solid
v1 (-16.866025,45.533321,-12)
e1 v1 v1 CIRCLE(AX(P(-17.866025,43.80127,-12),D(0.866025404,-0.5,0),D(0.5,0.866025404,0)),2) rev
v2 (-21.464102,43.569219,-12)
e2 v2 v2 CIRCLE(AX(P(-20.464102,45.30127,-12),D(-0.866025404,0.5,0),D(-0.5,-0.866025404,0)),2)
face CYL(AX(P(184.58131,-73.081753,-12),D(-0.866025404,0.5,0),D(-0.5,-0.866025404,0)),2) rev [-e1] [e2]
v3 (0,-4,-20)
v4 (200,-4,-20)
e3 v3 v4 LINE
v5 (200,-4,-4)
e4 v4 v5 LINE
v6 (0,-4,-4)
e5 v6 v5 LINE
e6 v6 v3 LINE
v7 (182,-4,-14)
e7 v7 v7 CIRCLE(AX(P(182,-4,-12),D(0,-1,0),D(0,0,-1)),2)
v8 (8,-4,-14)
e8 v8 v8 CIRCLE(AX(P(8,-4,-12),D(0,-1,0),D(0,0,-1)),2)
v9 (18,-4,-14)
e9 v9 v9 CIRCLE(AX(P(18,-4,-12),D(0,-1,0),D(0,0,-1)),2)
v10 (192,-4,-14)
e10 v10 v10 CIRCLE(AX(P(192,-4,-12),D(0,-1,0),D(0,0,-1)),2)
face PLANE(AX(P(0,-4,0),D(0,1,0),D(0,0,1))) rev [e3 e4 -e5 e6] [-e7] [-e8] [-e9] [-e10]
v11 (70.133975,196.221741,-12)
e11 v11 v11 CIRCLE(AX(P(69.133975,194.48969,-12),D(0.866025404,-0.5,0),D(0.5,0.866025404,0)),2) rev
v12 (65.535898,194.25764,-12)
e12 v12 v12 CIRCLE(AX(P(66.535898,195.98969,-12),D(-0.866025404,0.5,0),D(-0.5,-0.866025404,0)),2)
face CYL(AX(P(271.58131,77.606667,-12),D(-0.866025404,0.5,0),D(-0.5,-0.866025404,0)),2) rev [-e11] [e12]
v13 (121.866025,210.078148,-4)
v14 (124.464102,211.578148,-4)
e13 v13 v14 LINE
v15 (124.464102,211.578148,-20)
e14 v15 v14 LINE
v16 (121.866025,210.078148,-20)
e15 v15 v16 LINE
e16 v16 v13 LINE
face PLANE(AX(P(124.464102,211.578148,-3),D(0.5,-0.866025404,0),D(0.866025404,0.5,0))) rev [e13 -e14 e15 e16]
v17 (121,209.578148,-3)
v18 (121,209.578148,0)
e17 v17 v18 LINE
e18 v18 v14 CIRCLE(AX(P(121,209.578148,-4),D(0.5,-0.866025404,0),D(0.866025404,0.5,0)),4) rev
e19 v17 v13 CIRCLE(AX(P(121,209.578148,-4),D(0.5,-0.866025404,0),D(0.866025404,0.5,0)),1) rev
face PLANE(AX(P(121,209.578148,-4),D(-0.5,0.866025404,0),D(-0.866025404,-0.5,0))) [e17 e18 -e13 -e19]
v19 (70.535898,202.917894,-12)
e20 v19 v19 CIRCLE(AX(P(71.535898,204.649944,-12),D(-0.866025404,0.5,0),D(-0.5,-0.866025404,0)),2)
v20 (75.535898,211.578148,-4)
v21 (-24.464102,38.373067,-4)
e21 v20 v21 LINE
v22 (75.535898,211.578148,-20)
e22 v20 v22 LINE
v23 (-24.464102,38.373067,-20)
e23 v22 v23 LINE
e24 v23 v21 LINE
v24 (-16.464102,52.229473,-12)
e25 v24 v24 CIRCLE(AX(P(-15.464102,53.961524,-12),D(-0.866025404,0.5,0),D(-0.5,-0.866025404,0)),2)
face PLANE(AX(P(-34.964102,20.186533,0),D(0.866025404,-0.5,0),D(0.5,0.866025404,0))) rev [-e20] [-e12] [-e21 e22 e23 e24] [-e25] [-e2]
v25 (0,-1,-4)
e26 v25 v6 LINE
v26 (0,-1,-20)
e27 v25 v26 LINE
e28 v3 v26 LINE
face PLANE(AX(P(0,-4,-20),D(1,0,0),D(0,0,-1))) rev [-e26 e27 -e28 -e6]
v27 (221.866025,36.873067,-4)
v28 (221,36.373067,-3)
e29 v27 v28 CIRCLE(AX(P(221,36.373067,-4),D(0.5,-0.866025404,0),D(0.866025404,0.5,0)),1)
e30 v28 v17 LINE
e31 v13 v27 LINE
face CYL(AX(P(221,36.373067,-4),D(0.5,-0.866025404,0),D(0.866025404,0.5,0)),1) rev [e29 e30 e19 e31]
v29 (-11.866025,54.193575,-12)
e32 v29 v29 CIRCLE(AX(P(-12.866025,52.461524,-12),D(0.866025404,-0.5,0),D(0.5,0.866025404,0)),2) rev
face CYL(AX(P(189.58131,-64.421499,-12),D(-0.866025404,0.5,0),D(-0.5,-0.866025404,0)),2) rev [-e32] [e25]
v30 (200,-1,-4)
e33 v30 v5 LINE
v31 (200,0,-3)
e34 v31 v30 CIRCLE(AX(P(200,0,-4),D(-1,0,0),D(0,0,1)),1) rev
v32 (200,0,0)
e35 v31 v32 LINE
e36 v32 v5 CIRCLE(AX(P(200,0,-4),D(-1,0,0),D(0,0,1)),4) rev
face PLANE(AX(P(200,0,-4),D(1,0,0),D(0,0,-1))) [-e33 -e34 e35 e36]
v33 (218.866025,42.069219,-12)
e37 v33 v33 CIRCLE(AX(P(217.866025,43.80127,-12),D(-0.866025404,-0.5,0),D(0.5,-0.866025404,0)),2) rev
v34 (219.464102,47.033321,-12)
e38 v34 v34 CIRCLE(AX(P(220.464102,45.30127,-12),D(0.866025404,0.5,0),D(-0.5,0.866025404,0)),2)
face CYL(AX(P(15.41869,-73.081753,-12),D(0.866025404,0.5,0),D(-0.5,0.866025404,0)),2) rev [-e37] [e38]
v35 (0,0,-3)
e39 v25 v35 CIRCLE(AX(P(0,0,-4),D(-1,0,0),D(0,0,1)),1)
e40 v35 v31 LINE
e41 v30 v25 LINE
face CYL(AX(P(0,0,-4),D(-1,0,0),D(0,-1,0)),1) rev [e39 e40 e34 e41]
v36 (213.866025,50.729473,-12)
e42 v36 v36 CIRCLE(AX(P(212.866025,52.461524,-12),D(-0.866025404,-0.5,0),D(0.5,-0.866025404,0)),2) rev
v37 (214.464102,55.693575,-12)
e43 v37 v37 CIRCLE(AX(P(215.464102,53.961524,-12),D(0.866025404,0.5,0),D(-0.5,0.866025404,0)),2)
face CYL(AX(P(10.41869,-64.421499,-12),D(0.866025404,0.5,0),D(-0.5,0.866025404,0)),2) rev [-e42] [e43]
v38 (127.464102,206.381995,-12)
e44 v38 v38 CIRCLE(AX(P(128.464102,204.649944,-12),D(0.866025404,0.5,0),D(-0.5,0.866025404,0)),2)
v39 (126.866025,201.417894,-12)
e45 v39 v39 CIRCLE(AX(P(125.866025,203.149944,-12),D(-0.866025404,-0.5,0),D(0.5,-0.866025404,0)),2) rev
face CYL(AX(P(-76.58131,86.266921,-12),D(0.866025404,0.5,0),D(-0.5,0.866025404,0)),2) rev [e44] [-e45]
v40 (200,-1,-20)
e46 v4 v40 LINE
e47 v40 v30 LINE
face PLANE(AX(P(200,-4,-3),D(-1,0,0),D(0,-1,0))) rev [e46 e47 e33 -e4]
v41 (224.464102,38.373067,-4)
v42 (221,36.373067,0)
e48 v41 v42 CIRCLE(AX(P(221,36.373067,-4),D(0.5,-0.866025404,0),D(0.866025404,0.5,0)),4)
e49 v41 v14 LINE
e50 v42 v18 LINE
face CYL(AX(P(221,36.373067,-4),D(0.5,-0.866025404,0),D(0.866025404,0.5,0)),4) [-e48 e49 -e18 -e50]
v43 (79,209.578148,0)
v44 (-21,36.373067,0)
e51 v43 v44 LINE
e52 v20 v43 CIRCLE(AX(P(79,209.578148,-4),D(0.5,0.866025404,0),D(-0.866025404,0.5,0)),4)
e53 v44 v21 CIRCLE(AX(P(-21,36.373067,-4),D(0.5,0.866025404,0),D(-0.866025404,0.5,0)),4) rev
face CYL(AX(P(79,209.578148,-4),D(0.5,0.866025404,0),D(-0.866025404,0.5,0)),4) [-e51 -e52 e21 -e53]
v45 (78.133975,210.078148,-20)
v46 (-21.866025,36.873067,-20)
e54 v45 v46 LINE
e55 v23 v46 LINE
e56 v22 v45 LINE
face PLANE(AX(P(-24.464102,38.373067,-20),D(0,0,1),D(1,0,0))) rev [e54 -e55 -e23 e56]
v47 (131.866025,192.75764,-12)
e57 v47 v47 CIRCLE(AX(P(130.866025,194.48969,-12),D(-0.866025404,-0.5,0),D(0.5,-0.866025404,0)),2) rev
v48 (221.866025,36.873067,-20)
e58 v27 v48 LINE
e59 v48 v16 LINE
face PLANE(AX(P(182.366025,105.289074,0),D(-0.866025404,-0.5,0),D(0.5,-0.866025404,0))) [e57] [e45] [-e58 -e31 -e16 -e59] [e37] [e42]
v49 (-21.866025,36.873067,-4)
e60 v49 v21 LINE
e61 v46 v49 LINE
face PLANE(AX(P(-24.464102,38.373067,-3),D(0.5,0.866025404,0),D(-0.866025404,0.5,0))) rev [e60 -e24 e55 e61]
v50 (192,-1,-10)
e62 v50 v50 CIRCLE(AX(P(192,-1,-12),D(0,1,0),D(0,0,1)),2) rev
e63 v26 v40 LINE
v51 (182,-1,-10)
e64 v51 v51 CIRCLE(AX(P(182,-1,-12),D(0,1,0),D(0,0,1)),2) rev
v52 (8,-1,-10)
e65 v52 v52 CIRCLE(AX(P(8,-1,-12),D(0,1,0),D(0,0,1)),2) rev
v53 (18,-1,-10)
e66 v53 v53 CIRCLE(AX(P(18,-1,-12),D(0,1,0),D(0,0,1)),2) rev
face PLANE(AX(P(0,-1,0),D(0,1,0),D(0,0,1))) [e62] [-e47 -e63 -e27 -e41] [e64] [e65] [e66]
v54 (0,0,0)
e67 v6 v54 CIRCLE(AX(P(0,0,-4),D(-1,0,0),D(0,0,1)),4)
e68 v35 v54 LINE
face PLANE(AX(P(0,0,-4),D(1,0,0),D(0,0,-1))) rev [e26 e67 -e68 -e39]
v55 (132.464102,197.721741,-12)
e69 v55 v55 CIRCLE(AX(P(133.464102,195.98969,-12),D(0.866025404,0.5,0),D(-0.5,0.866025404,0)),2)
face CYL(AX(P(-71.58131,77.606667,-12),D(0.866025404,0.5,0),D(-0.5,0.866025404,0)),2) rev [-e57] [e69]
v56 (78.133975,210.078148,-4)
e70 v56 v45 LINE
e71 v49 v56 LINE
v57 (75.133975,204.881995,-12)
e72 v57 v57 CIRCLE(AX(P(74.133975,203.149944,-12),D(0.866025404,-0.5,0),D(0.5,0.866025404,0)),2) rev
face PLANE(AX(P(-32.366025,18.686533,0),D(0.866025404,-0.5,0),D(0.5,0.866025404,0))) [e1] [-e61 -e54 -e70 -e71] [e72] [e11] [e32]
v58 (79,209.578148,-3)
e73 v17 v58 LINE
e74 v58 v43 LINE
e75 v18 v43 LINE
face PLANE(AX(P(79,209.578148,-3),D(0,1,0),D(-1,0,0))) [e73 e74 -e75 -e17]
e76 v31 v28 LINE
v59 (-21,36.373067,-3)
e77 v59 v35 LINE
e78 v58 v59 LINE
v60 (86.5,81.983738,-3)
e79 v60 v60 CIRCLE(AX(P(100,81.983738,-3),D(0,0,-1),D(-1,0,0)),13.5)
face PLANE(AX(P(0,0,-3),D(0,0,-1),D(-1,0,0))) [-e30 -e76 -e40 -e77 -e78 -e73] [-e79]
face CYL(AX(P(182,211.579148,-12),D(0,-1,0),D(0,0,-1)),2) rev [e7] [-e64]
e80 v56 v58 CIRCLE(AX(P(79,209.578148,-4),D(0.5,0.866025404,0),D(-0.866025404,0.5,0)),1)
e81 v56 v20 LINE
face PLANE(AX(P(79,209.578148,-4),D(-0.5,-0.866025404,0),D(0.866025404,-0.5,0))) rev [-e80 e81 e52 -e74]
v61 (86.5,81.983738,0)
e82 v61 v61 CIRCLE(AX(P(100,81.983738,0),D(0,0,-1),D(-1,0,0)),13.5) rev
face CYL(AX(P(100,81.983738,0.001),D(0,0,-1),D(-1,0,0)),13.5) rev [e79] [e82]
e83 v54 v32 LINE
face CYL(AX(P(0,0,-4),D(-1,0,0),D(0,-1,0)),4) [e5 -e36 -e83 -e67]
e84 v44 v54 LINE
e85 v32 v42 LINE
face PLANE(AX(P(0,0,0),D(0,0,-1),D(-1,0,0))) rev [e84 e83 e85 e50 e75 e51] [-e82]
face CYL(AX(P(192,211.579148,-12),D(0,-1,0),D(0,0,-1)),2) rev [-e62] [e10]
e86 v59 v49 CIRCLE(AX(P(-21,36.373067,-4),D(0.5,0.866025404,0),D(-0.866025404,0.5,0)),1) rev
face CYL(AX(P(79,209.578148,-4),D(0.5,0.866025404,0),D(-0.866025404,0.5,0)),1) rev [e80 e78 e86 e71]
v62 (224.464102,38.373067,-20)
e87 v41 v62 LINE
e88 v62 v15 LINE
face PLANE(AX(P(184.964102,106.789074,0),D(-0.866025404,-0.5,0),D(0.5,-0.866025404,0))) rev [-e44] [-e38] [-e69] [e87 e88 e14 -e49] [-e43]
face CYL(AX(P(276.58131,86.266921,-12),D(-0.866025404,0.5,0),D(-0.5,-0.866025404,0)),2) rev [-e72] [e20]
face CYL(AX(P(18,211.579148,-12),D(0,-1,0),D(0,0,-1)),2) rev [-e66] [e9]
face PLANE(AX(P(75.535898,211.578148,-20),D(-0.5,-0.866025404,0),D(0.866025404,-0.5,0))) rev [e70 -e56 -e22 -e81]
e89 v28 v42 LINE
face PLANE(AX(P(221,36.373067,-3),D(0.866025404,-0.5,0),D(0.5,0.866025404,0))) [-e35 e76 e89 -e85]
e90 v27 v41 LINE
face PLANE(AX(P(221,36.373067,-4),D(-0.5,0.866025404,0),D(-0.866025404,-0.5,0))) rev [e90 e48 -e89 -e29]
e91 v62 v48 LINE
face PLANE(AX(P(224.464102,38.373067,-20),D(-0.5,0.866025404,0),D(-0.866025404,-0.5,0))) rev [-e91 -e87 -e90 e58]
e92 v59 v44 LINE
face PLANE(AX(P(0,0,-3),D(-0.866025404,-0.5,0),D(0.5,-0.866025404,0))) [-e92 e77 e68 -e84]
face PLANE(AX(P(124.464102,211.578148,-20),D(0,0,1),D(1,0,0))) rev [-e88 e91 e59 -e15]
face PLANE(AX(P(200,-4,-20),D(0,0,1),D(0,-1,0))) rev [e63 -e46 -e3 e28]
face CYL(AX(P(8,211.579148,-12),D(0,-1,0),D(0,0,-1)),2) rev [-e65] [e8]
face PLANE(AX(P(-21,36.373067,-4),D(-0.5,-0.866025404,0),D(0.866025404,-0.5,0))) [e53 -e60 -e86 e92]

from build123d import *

# Parameters (mm, degrees)
SM_BASE_FLANGE_3_DEPTH        = 3
SM_EDGE_FLANGE_6_DEPTH        = 200
SM_EDGE_FLANGE_6_BEND_DEPTH   = 200
SM_EDGE_FLANGE_6_BEND_2_DEPTH = 200
CUT_EXTRUDE_4_REACH           = 325.007
SKETCH_47_R                   = 2
CUT_EXTRUDE_6_REACH           = 239.77
SKETCH_50_R                   = 2
CUT_EXTRUDE_7_REACH           = 313.862
SKETCH_51_R                   = 2
CUT_EXTRUDE_8_REACH           = 310.931
SKETCH_52_R                   = 13.5


# Sheet-metal steps are written as plain solids
with BuildPart() as part:
    # Эскиз10 → Базовая кромка3 (new body)
    with BuildSketch(Plane.XY):
        Polygon((0, 0), (-21, 36.373066959), (79, 209.578147716), (121, 209.578147716), (221, 36.373066959), (200, 0), align=None)
    extrude(amount=-SM_BASE_FLANGE_3_DEPTH)

    # Ребро-кромка6 section (across the edge) → Ребро-кромка6 (add)
    with BuildSketch(Plane(origin=(-21.866025404, 36.873066959, -3), x_dir=(0.8660254037844437, -0.4999999999999915, -3.4914813388431334e-15), z_dir=(0.4999999999999915, 0.8660254037844437, 0))):
        with BuildLine():
            Line((-3, 1), (-3, 17))
            Line((-3, 17), (0, 17))
            Line((0, 17), (0, 1))
            ThreePointArc((0, 1), (0.292893219, 0.292893219), (1, 0))
            Line((1, 0), (1, -3))
            ThreePointArc((1, -3), (-1.828427125, -1.828427125), (-3, 1))
        make_face()
    extrude(amount=SM_EDGE_FLANGE_6_DEPTH)

    # Ребро-кромка6 section 2 (across the edge) → Ребро-кромка6 bend (add)
    with BuildSketch(Plane(origin=(121.866025404, 210.078147716, -3), x_dir=(-0.8660254037844362, -0.5000000000000044, -3.491481338843134e-15), z_dir=(0.5000000000000044, -0.8660254037844362, 0))):
        with BuildLine():
            Line((-3, 1), (-3, 17))
            Line((-3, 17), (0, 17))
            Line((0, 17), (0, 1))
            ThreePointArc((0, 1), (0.292893219, 0.292893219), (1, 0))
            Line((1, 0), (1, -3))
            ThreePointArc((1, -3), (-1.828427125, -1.828427125), (-3, 1))
        make_face()
    extrude(amount=SM_EDGE_FLANGE_6_BEND_DEPTH)

    # Ребро-кромка6 section 3 (across the edge) → Ребро-кромка6 bend 2 (add)
    with BuildSketch(Plane(origin=(200, -1, -3), x_dir=(0, 1, 0), z_dir=(-1, 0, 0))):
        with BuildLine():
            Line((-3, 1), (-3, 17))
            Line((-3, 17), (0, 17))
            Line((0, 17), (0, 1))
            ThreePointArc((0, 1), (0.292893219, 0.292893219), (1, 0))
            Line((1, 0), (1, -3))
            ThreePointArc((1, -3), (-1.828427125, -1.828427125), (-3, 1))
        make_face()
    extrude(amount=SM_EDGE_FLANGE_6_BEND_2_DEPTH)

    # Эскиз47 → Вырез-Вытянуть4 (cut, up to next)
    with BuildSketch(Plane(origin=(-34.964101615, 20.186533479, 0), x_dir=(0, 0, 1), z_dir=(-0.866025403784443, 0.4999999999999925, 3.788649256556814e-15)), mode=Mode.PRIVATE) as cut_extrude_4_sk1:
        with Locations(Location((-12, 29, 0), (0, 0, 270))):
            Circle(SKETCH_47_R)
    cut_extrude_4_tool1 = extrude(cut_extrude_4_sk1.sketch, amount=-CUT_EXTRUDE_4_REACH, mode=Mode.PRIVATE) & part.part
    # Эскиз47 → Вырез-Вытянуть4 (cut, up to next)
    with BuildSketch(Plane(origin=(-34.964101615, 20.186533479, 0), x_dir=(0, 0, 1), z_dir=(-0.866025403784443, 0.4999999999999925, 3.788649256556814e-15)), mode=Mode.PRIVATE) as cut_extrude_4_sk2:
        with Locations(Location((-12, 39, 0), (0, 0, 270))):
            Circle(SKETCH_47_R)
    cut_extrude_4_tool2 = extrude(cut_extrude_4_sk2.sketch, amount=-CUT_EXTRUDE_4_REACH, mode=Mode.PRIVATE) & part.part
    # Эскиз47 → Вырез-Вытянуть4 (cut, up to next)
    with BuildSketch(Plane(origin=(-34.964101615, 20.186533479, 0), x_dir=(0, 0, 1), z_dir=(-0.866025403784443, 0.4999999999999925, 3.788649256556814e-15)), mode=Mode.PRIVATE) as cut_extrude_4_sk3:
        with Locations(Location((-12, 203, 0), (0, 0, 270))):
            Circle(SKETCH_47_R)
    cut_extrude_4_tool3 = extrude(cut_extrude_4_sk3.sketch, amount=-CUT_EXTRUDE_4_REACH, mode=Mode.PRIVATE) & part.part
    # Эскиз47 → Вырез-Вытянуть4 (cut, up to next)
    with BuildSketch(Plane(origin=(-34.964101615, 20.186533479, 0), x_dir=(0, 0, 1), z_dir=(-0.866025403784443, 0.4999999999999925, 3.788649256556814e-15)), mode=Mode.PRIVATE) as cut_extrude_4_sk4:
        with Locations(Location((-12, 213, 0), (0, 0, 270))):
            Circle(SKETCH_47_R)
    cut_extrude_4_tool4 = extrude(cut_extrude_4_sk4.sketch, amount=-CUT_EXTRUDE_4_REACH, mode=Mode.PRIVATE) & part.part
    add(cut_extrude_4_tool1.solids().sort_by_distance((-20.464102, 45.30127, -12))[0], mode=Mode.SUBTRACT)
    add(cut_extrude_4_tool2.solids().sort_by_distance((-15.464102, 53.961524, -12))[0], mode=Mode.SUBTRACT)
    add(cut_extrude_4_tool3.solids().sort_by_distance((66.535898, 195.98969, -12))[0], mode=Mode.SUBTRACT)
    add(cut_extrude_4_tool4.solids().sort_by_distance((71.535898, 204.649944, -12))[0], mode=Mode.SUBTRACT)

    # Эскиз50 → Вырез-Вытянуть6 (cut, up to next)
    with BuildSketch(Plane(origin=(184.964101615, 106.789073858, 0), x_dir=(0, 0, -1), z_dir=(0.866025403784436, 0.5000000000000047, 3.0623287353932815e-15)), mode=Mode.PRIVATE) as cut_extrude_6_sk1:
        with Locations(Location((12, -71, 0), (0, 0, 90))):
            Circle(SKETCH_50_R)
    cut_extrude_6_tool1 = extrude(cut_extrude_6_sk1.sketch, amount=-CUT_EXTRUDE_6_REACH, mode=Mode.PRIVATE) & part.part
    # Эскиз50 → Вырез-Вытянуть6 (cut, up to next)
    with BuildSketch(Plane(origin=(184.964101615, 106.789073858, 0), x_dir=(0, 0, -1), z_dir=(0.866025403784436, 0.5000000000000047, 3.0623287353932815e-15)), mode=Mode.PRIVATE) as cut_extrude_6_sk2:
        with Locations(Location((12, -61, 0), (0, 0, 90))):
            Circle(SKETCH_50_R)
    cut_extrude_6_tool2 = extrude(cut_extrude_6_sk2.sketch, amount=-CUT_EXTRUDE_6_REACH, mode=Mode.PRIVATE) & part.part
    # Эскиз50 → Вырез-Вытянуть6 (cut, up to next)
    with BuildSketch(Plane(origin=(184.964101615, 106.789073858, 0), x_dir=(0, 0, -1), z_dir=(0.866025403784436, 0.5000000000000047, 3.0623287353932815e-15)), mode=Mode.PRIVATE) as cut_extrude_6_sk3:
        with Locations(Location((12, 103, 0), (0, 0, 90))):
            Circle(SKETCH_50_R)
    cut_extrude_6_tool3 = extrude(cut_extrude_6_sk3.sketch, amount=-CUT_EXTRUDE_6_REACH, mode=Mode.PRIVATE) & part.part
    # Эскиз50 → Вырез-Вытянуть6 (cut, up to next)
    with BuildSketch(Plane(origin=(184.964101615, 106.789073858, 0), x_dir=(0, 0, -1), z_dir=(0.866025403784436, 0.5000000000000047, 3.0623287353932815e-15)), mode=Mode.PRIVATE) as cut_extrude_6_sk4:
        with Locations(Location((12, 113, 0), (0, 0, 90))):
            Circle(SKETCH_50_R)
    cut_extrude_6_tool4 = extrude(cut_extrude_6_sk4.sketch, amount=-CUT_EXTRUDE_6_REACH, mode=Mode.PRIVATE) & part.part
    add(cut_extrude_6_tool1.solids().sort_by_distance((220.464102, 45.30127, -12))[0], mode=Mode.SUBTRACT)
    add(cut_extrude_6_tool2.solids().sort_by_distance((215.464102, 53.961524, -12))[0], mode=Mode.SUBTRACT)
    add(cut_extrude_6_tool3.solids().sort_by_distance((133.464102, 195.98969, -12))[0], mode=Mode.SUBTRACT)
    add(cut_extrude_6_tool4.solids().sort_by_distance((128.464102, 204.649944, -12))[0], mode=Mode.SUBTRACT)

    # Эскиз51 → Вырез-Вытянуть7 (cut, up to next)
    with BuildSketch(Plane.XZ.offset(4), mode=Mode.PRIVATE) as cut_extrude_7_sk1:
        with Locations(Location((192, -12, 0), (0, 0, 270))):
            Circle(SKETCH_51_R)
    cut_extrude_7_tool1 = extrude(cut_extrude_7_sk1.sketch, amount=-CUT_EXTRUDE_7_REACH, mode=Mode.PRIVATE) & part.part
    # Эскиз51 → Вырез-Вытянуть7 (cut, up to next)
    with BuildSketch(Plane.XZ.offset(4), mode=Mode.PRIVATE) as cut_extrude_7_sk2:
        with Locations(Location((182, -12, 0), (0, 0, 270))):
            Circle(SKETCH_51_R)
    cut_extrude_7_tool2 = extrude(cut_extrude_7_sk2.sketch, amount=-CUT_EXTRUDE_7_REACH, mode=Mode.PRIVATE) & part.part
    # Эскиз51 → Вырез-Вытянуть7 (cut, up to next)
    with BuildSketch(Plane.XZ.offset(4), mode=Mode.PRIVATE) as cut_extrude_7_sk3:
        with Locations(Location((18, -12, 0), (0, 0, 270))):
            Circle(SKETCH_51_R)
    cut_extrude_7_tool3 = extrude(cut_extrude_7_sk3.sketch, amount=-CUT_EXTRUDE_7_REACH, mode=Mode.PRIVATE) & part.part
    # Эскиз51 → Вырез-Вытянуть7 (cut, up to next)
    with BuildSketch(Plane.XZ.offset(4), mode=Mode.PRIVATE) as cut_extrude_7_sk4:
        with Locations(Location((8, -12, 0), (0, 0, 270))):
            Circle(SKETCH_51_R)
    cut_extrude_7_tool4 = extrude(cut_extrude_7_sk4.sketch, amount=-CUT_EXTRUDE_7_REACH, mode=Mode.PRIVATE) & part.part
    add(cut_extrude_7_tool1.solids().sort_by_distance((192, -4, -12))[0], mode=Mode.SUBTRACT)
    add(cut_extrude_7_tool2.solids().sort_by_distance((182, -4, -12))[0], mode=Mode.SUBTRACT)
    add(cut_extrude_7_tool3.solids().sort_by_distance((18, -4, -12))[0], mode=Mode.SUBTRACT)
    add(cut_extrude_7_tool4.solids().sort_by_distance((8, -4, -12))[0], mode=Mode.SUBTRACT)

    # Эскиз52 → Вырез-Вытянуть8 (cut, up to next)
    with BuildSketch(Plane(origin=(0, 0, -3), x_dir=(-1, 0, 0), z_dir=(0, 0, -1)), mode=Mode.PRIVATE) as cut_extrude_8_sk1:
        with Locations((-100, 81.983738225)):
            Circle(SKETCH_52_R)
    cut_extrude_8_tool1 = extrude(cut_extrude_8_sk1.sketch, amount=-CUT_EXTRUDE_8_REACH, mode=Mode.PRIVATE) & part.part
    add(cut_extrude_8_tool1.solids().sort_by_distance((100, 81.983738, -3))[0], mode=Mode.SUBTRACT)


solid = part.part
